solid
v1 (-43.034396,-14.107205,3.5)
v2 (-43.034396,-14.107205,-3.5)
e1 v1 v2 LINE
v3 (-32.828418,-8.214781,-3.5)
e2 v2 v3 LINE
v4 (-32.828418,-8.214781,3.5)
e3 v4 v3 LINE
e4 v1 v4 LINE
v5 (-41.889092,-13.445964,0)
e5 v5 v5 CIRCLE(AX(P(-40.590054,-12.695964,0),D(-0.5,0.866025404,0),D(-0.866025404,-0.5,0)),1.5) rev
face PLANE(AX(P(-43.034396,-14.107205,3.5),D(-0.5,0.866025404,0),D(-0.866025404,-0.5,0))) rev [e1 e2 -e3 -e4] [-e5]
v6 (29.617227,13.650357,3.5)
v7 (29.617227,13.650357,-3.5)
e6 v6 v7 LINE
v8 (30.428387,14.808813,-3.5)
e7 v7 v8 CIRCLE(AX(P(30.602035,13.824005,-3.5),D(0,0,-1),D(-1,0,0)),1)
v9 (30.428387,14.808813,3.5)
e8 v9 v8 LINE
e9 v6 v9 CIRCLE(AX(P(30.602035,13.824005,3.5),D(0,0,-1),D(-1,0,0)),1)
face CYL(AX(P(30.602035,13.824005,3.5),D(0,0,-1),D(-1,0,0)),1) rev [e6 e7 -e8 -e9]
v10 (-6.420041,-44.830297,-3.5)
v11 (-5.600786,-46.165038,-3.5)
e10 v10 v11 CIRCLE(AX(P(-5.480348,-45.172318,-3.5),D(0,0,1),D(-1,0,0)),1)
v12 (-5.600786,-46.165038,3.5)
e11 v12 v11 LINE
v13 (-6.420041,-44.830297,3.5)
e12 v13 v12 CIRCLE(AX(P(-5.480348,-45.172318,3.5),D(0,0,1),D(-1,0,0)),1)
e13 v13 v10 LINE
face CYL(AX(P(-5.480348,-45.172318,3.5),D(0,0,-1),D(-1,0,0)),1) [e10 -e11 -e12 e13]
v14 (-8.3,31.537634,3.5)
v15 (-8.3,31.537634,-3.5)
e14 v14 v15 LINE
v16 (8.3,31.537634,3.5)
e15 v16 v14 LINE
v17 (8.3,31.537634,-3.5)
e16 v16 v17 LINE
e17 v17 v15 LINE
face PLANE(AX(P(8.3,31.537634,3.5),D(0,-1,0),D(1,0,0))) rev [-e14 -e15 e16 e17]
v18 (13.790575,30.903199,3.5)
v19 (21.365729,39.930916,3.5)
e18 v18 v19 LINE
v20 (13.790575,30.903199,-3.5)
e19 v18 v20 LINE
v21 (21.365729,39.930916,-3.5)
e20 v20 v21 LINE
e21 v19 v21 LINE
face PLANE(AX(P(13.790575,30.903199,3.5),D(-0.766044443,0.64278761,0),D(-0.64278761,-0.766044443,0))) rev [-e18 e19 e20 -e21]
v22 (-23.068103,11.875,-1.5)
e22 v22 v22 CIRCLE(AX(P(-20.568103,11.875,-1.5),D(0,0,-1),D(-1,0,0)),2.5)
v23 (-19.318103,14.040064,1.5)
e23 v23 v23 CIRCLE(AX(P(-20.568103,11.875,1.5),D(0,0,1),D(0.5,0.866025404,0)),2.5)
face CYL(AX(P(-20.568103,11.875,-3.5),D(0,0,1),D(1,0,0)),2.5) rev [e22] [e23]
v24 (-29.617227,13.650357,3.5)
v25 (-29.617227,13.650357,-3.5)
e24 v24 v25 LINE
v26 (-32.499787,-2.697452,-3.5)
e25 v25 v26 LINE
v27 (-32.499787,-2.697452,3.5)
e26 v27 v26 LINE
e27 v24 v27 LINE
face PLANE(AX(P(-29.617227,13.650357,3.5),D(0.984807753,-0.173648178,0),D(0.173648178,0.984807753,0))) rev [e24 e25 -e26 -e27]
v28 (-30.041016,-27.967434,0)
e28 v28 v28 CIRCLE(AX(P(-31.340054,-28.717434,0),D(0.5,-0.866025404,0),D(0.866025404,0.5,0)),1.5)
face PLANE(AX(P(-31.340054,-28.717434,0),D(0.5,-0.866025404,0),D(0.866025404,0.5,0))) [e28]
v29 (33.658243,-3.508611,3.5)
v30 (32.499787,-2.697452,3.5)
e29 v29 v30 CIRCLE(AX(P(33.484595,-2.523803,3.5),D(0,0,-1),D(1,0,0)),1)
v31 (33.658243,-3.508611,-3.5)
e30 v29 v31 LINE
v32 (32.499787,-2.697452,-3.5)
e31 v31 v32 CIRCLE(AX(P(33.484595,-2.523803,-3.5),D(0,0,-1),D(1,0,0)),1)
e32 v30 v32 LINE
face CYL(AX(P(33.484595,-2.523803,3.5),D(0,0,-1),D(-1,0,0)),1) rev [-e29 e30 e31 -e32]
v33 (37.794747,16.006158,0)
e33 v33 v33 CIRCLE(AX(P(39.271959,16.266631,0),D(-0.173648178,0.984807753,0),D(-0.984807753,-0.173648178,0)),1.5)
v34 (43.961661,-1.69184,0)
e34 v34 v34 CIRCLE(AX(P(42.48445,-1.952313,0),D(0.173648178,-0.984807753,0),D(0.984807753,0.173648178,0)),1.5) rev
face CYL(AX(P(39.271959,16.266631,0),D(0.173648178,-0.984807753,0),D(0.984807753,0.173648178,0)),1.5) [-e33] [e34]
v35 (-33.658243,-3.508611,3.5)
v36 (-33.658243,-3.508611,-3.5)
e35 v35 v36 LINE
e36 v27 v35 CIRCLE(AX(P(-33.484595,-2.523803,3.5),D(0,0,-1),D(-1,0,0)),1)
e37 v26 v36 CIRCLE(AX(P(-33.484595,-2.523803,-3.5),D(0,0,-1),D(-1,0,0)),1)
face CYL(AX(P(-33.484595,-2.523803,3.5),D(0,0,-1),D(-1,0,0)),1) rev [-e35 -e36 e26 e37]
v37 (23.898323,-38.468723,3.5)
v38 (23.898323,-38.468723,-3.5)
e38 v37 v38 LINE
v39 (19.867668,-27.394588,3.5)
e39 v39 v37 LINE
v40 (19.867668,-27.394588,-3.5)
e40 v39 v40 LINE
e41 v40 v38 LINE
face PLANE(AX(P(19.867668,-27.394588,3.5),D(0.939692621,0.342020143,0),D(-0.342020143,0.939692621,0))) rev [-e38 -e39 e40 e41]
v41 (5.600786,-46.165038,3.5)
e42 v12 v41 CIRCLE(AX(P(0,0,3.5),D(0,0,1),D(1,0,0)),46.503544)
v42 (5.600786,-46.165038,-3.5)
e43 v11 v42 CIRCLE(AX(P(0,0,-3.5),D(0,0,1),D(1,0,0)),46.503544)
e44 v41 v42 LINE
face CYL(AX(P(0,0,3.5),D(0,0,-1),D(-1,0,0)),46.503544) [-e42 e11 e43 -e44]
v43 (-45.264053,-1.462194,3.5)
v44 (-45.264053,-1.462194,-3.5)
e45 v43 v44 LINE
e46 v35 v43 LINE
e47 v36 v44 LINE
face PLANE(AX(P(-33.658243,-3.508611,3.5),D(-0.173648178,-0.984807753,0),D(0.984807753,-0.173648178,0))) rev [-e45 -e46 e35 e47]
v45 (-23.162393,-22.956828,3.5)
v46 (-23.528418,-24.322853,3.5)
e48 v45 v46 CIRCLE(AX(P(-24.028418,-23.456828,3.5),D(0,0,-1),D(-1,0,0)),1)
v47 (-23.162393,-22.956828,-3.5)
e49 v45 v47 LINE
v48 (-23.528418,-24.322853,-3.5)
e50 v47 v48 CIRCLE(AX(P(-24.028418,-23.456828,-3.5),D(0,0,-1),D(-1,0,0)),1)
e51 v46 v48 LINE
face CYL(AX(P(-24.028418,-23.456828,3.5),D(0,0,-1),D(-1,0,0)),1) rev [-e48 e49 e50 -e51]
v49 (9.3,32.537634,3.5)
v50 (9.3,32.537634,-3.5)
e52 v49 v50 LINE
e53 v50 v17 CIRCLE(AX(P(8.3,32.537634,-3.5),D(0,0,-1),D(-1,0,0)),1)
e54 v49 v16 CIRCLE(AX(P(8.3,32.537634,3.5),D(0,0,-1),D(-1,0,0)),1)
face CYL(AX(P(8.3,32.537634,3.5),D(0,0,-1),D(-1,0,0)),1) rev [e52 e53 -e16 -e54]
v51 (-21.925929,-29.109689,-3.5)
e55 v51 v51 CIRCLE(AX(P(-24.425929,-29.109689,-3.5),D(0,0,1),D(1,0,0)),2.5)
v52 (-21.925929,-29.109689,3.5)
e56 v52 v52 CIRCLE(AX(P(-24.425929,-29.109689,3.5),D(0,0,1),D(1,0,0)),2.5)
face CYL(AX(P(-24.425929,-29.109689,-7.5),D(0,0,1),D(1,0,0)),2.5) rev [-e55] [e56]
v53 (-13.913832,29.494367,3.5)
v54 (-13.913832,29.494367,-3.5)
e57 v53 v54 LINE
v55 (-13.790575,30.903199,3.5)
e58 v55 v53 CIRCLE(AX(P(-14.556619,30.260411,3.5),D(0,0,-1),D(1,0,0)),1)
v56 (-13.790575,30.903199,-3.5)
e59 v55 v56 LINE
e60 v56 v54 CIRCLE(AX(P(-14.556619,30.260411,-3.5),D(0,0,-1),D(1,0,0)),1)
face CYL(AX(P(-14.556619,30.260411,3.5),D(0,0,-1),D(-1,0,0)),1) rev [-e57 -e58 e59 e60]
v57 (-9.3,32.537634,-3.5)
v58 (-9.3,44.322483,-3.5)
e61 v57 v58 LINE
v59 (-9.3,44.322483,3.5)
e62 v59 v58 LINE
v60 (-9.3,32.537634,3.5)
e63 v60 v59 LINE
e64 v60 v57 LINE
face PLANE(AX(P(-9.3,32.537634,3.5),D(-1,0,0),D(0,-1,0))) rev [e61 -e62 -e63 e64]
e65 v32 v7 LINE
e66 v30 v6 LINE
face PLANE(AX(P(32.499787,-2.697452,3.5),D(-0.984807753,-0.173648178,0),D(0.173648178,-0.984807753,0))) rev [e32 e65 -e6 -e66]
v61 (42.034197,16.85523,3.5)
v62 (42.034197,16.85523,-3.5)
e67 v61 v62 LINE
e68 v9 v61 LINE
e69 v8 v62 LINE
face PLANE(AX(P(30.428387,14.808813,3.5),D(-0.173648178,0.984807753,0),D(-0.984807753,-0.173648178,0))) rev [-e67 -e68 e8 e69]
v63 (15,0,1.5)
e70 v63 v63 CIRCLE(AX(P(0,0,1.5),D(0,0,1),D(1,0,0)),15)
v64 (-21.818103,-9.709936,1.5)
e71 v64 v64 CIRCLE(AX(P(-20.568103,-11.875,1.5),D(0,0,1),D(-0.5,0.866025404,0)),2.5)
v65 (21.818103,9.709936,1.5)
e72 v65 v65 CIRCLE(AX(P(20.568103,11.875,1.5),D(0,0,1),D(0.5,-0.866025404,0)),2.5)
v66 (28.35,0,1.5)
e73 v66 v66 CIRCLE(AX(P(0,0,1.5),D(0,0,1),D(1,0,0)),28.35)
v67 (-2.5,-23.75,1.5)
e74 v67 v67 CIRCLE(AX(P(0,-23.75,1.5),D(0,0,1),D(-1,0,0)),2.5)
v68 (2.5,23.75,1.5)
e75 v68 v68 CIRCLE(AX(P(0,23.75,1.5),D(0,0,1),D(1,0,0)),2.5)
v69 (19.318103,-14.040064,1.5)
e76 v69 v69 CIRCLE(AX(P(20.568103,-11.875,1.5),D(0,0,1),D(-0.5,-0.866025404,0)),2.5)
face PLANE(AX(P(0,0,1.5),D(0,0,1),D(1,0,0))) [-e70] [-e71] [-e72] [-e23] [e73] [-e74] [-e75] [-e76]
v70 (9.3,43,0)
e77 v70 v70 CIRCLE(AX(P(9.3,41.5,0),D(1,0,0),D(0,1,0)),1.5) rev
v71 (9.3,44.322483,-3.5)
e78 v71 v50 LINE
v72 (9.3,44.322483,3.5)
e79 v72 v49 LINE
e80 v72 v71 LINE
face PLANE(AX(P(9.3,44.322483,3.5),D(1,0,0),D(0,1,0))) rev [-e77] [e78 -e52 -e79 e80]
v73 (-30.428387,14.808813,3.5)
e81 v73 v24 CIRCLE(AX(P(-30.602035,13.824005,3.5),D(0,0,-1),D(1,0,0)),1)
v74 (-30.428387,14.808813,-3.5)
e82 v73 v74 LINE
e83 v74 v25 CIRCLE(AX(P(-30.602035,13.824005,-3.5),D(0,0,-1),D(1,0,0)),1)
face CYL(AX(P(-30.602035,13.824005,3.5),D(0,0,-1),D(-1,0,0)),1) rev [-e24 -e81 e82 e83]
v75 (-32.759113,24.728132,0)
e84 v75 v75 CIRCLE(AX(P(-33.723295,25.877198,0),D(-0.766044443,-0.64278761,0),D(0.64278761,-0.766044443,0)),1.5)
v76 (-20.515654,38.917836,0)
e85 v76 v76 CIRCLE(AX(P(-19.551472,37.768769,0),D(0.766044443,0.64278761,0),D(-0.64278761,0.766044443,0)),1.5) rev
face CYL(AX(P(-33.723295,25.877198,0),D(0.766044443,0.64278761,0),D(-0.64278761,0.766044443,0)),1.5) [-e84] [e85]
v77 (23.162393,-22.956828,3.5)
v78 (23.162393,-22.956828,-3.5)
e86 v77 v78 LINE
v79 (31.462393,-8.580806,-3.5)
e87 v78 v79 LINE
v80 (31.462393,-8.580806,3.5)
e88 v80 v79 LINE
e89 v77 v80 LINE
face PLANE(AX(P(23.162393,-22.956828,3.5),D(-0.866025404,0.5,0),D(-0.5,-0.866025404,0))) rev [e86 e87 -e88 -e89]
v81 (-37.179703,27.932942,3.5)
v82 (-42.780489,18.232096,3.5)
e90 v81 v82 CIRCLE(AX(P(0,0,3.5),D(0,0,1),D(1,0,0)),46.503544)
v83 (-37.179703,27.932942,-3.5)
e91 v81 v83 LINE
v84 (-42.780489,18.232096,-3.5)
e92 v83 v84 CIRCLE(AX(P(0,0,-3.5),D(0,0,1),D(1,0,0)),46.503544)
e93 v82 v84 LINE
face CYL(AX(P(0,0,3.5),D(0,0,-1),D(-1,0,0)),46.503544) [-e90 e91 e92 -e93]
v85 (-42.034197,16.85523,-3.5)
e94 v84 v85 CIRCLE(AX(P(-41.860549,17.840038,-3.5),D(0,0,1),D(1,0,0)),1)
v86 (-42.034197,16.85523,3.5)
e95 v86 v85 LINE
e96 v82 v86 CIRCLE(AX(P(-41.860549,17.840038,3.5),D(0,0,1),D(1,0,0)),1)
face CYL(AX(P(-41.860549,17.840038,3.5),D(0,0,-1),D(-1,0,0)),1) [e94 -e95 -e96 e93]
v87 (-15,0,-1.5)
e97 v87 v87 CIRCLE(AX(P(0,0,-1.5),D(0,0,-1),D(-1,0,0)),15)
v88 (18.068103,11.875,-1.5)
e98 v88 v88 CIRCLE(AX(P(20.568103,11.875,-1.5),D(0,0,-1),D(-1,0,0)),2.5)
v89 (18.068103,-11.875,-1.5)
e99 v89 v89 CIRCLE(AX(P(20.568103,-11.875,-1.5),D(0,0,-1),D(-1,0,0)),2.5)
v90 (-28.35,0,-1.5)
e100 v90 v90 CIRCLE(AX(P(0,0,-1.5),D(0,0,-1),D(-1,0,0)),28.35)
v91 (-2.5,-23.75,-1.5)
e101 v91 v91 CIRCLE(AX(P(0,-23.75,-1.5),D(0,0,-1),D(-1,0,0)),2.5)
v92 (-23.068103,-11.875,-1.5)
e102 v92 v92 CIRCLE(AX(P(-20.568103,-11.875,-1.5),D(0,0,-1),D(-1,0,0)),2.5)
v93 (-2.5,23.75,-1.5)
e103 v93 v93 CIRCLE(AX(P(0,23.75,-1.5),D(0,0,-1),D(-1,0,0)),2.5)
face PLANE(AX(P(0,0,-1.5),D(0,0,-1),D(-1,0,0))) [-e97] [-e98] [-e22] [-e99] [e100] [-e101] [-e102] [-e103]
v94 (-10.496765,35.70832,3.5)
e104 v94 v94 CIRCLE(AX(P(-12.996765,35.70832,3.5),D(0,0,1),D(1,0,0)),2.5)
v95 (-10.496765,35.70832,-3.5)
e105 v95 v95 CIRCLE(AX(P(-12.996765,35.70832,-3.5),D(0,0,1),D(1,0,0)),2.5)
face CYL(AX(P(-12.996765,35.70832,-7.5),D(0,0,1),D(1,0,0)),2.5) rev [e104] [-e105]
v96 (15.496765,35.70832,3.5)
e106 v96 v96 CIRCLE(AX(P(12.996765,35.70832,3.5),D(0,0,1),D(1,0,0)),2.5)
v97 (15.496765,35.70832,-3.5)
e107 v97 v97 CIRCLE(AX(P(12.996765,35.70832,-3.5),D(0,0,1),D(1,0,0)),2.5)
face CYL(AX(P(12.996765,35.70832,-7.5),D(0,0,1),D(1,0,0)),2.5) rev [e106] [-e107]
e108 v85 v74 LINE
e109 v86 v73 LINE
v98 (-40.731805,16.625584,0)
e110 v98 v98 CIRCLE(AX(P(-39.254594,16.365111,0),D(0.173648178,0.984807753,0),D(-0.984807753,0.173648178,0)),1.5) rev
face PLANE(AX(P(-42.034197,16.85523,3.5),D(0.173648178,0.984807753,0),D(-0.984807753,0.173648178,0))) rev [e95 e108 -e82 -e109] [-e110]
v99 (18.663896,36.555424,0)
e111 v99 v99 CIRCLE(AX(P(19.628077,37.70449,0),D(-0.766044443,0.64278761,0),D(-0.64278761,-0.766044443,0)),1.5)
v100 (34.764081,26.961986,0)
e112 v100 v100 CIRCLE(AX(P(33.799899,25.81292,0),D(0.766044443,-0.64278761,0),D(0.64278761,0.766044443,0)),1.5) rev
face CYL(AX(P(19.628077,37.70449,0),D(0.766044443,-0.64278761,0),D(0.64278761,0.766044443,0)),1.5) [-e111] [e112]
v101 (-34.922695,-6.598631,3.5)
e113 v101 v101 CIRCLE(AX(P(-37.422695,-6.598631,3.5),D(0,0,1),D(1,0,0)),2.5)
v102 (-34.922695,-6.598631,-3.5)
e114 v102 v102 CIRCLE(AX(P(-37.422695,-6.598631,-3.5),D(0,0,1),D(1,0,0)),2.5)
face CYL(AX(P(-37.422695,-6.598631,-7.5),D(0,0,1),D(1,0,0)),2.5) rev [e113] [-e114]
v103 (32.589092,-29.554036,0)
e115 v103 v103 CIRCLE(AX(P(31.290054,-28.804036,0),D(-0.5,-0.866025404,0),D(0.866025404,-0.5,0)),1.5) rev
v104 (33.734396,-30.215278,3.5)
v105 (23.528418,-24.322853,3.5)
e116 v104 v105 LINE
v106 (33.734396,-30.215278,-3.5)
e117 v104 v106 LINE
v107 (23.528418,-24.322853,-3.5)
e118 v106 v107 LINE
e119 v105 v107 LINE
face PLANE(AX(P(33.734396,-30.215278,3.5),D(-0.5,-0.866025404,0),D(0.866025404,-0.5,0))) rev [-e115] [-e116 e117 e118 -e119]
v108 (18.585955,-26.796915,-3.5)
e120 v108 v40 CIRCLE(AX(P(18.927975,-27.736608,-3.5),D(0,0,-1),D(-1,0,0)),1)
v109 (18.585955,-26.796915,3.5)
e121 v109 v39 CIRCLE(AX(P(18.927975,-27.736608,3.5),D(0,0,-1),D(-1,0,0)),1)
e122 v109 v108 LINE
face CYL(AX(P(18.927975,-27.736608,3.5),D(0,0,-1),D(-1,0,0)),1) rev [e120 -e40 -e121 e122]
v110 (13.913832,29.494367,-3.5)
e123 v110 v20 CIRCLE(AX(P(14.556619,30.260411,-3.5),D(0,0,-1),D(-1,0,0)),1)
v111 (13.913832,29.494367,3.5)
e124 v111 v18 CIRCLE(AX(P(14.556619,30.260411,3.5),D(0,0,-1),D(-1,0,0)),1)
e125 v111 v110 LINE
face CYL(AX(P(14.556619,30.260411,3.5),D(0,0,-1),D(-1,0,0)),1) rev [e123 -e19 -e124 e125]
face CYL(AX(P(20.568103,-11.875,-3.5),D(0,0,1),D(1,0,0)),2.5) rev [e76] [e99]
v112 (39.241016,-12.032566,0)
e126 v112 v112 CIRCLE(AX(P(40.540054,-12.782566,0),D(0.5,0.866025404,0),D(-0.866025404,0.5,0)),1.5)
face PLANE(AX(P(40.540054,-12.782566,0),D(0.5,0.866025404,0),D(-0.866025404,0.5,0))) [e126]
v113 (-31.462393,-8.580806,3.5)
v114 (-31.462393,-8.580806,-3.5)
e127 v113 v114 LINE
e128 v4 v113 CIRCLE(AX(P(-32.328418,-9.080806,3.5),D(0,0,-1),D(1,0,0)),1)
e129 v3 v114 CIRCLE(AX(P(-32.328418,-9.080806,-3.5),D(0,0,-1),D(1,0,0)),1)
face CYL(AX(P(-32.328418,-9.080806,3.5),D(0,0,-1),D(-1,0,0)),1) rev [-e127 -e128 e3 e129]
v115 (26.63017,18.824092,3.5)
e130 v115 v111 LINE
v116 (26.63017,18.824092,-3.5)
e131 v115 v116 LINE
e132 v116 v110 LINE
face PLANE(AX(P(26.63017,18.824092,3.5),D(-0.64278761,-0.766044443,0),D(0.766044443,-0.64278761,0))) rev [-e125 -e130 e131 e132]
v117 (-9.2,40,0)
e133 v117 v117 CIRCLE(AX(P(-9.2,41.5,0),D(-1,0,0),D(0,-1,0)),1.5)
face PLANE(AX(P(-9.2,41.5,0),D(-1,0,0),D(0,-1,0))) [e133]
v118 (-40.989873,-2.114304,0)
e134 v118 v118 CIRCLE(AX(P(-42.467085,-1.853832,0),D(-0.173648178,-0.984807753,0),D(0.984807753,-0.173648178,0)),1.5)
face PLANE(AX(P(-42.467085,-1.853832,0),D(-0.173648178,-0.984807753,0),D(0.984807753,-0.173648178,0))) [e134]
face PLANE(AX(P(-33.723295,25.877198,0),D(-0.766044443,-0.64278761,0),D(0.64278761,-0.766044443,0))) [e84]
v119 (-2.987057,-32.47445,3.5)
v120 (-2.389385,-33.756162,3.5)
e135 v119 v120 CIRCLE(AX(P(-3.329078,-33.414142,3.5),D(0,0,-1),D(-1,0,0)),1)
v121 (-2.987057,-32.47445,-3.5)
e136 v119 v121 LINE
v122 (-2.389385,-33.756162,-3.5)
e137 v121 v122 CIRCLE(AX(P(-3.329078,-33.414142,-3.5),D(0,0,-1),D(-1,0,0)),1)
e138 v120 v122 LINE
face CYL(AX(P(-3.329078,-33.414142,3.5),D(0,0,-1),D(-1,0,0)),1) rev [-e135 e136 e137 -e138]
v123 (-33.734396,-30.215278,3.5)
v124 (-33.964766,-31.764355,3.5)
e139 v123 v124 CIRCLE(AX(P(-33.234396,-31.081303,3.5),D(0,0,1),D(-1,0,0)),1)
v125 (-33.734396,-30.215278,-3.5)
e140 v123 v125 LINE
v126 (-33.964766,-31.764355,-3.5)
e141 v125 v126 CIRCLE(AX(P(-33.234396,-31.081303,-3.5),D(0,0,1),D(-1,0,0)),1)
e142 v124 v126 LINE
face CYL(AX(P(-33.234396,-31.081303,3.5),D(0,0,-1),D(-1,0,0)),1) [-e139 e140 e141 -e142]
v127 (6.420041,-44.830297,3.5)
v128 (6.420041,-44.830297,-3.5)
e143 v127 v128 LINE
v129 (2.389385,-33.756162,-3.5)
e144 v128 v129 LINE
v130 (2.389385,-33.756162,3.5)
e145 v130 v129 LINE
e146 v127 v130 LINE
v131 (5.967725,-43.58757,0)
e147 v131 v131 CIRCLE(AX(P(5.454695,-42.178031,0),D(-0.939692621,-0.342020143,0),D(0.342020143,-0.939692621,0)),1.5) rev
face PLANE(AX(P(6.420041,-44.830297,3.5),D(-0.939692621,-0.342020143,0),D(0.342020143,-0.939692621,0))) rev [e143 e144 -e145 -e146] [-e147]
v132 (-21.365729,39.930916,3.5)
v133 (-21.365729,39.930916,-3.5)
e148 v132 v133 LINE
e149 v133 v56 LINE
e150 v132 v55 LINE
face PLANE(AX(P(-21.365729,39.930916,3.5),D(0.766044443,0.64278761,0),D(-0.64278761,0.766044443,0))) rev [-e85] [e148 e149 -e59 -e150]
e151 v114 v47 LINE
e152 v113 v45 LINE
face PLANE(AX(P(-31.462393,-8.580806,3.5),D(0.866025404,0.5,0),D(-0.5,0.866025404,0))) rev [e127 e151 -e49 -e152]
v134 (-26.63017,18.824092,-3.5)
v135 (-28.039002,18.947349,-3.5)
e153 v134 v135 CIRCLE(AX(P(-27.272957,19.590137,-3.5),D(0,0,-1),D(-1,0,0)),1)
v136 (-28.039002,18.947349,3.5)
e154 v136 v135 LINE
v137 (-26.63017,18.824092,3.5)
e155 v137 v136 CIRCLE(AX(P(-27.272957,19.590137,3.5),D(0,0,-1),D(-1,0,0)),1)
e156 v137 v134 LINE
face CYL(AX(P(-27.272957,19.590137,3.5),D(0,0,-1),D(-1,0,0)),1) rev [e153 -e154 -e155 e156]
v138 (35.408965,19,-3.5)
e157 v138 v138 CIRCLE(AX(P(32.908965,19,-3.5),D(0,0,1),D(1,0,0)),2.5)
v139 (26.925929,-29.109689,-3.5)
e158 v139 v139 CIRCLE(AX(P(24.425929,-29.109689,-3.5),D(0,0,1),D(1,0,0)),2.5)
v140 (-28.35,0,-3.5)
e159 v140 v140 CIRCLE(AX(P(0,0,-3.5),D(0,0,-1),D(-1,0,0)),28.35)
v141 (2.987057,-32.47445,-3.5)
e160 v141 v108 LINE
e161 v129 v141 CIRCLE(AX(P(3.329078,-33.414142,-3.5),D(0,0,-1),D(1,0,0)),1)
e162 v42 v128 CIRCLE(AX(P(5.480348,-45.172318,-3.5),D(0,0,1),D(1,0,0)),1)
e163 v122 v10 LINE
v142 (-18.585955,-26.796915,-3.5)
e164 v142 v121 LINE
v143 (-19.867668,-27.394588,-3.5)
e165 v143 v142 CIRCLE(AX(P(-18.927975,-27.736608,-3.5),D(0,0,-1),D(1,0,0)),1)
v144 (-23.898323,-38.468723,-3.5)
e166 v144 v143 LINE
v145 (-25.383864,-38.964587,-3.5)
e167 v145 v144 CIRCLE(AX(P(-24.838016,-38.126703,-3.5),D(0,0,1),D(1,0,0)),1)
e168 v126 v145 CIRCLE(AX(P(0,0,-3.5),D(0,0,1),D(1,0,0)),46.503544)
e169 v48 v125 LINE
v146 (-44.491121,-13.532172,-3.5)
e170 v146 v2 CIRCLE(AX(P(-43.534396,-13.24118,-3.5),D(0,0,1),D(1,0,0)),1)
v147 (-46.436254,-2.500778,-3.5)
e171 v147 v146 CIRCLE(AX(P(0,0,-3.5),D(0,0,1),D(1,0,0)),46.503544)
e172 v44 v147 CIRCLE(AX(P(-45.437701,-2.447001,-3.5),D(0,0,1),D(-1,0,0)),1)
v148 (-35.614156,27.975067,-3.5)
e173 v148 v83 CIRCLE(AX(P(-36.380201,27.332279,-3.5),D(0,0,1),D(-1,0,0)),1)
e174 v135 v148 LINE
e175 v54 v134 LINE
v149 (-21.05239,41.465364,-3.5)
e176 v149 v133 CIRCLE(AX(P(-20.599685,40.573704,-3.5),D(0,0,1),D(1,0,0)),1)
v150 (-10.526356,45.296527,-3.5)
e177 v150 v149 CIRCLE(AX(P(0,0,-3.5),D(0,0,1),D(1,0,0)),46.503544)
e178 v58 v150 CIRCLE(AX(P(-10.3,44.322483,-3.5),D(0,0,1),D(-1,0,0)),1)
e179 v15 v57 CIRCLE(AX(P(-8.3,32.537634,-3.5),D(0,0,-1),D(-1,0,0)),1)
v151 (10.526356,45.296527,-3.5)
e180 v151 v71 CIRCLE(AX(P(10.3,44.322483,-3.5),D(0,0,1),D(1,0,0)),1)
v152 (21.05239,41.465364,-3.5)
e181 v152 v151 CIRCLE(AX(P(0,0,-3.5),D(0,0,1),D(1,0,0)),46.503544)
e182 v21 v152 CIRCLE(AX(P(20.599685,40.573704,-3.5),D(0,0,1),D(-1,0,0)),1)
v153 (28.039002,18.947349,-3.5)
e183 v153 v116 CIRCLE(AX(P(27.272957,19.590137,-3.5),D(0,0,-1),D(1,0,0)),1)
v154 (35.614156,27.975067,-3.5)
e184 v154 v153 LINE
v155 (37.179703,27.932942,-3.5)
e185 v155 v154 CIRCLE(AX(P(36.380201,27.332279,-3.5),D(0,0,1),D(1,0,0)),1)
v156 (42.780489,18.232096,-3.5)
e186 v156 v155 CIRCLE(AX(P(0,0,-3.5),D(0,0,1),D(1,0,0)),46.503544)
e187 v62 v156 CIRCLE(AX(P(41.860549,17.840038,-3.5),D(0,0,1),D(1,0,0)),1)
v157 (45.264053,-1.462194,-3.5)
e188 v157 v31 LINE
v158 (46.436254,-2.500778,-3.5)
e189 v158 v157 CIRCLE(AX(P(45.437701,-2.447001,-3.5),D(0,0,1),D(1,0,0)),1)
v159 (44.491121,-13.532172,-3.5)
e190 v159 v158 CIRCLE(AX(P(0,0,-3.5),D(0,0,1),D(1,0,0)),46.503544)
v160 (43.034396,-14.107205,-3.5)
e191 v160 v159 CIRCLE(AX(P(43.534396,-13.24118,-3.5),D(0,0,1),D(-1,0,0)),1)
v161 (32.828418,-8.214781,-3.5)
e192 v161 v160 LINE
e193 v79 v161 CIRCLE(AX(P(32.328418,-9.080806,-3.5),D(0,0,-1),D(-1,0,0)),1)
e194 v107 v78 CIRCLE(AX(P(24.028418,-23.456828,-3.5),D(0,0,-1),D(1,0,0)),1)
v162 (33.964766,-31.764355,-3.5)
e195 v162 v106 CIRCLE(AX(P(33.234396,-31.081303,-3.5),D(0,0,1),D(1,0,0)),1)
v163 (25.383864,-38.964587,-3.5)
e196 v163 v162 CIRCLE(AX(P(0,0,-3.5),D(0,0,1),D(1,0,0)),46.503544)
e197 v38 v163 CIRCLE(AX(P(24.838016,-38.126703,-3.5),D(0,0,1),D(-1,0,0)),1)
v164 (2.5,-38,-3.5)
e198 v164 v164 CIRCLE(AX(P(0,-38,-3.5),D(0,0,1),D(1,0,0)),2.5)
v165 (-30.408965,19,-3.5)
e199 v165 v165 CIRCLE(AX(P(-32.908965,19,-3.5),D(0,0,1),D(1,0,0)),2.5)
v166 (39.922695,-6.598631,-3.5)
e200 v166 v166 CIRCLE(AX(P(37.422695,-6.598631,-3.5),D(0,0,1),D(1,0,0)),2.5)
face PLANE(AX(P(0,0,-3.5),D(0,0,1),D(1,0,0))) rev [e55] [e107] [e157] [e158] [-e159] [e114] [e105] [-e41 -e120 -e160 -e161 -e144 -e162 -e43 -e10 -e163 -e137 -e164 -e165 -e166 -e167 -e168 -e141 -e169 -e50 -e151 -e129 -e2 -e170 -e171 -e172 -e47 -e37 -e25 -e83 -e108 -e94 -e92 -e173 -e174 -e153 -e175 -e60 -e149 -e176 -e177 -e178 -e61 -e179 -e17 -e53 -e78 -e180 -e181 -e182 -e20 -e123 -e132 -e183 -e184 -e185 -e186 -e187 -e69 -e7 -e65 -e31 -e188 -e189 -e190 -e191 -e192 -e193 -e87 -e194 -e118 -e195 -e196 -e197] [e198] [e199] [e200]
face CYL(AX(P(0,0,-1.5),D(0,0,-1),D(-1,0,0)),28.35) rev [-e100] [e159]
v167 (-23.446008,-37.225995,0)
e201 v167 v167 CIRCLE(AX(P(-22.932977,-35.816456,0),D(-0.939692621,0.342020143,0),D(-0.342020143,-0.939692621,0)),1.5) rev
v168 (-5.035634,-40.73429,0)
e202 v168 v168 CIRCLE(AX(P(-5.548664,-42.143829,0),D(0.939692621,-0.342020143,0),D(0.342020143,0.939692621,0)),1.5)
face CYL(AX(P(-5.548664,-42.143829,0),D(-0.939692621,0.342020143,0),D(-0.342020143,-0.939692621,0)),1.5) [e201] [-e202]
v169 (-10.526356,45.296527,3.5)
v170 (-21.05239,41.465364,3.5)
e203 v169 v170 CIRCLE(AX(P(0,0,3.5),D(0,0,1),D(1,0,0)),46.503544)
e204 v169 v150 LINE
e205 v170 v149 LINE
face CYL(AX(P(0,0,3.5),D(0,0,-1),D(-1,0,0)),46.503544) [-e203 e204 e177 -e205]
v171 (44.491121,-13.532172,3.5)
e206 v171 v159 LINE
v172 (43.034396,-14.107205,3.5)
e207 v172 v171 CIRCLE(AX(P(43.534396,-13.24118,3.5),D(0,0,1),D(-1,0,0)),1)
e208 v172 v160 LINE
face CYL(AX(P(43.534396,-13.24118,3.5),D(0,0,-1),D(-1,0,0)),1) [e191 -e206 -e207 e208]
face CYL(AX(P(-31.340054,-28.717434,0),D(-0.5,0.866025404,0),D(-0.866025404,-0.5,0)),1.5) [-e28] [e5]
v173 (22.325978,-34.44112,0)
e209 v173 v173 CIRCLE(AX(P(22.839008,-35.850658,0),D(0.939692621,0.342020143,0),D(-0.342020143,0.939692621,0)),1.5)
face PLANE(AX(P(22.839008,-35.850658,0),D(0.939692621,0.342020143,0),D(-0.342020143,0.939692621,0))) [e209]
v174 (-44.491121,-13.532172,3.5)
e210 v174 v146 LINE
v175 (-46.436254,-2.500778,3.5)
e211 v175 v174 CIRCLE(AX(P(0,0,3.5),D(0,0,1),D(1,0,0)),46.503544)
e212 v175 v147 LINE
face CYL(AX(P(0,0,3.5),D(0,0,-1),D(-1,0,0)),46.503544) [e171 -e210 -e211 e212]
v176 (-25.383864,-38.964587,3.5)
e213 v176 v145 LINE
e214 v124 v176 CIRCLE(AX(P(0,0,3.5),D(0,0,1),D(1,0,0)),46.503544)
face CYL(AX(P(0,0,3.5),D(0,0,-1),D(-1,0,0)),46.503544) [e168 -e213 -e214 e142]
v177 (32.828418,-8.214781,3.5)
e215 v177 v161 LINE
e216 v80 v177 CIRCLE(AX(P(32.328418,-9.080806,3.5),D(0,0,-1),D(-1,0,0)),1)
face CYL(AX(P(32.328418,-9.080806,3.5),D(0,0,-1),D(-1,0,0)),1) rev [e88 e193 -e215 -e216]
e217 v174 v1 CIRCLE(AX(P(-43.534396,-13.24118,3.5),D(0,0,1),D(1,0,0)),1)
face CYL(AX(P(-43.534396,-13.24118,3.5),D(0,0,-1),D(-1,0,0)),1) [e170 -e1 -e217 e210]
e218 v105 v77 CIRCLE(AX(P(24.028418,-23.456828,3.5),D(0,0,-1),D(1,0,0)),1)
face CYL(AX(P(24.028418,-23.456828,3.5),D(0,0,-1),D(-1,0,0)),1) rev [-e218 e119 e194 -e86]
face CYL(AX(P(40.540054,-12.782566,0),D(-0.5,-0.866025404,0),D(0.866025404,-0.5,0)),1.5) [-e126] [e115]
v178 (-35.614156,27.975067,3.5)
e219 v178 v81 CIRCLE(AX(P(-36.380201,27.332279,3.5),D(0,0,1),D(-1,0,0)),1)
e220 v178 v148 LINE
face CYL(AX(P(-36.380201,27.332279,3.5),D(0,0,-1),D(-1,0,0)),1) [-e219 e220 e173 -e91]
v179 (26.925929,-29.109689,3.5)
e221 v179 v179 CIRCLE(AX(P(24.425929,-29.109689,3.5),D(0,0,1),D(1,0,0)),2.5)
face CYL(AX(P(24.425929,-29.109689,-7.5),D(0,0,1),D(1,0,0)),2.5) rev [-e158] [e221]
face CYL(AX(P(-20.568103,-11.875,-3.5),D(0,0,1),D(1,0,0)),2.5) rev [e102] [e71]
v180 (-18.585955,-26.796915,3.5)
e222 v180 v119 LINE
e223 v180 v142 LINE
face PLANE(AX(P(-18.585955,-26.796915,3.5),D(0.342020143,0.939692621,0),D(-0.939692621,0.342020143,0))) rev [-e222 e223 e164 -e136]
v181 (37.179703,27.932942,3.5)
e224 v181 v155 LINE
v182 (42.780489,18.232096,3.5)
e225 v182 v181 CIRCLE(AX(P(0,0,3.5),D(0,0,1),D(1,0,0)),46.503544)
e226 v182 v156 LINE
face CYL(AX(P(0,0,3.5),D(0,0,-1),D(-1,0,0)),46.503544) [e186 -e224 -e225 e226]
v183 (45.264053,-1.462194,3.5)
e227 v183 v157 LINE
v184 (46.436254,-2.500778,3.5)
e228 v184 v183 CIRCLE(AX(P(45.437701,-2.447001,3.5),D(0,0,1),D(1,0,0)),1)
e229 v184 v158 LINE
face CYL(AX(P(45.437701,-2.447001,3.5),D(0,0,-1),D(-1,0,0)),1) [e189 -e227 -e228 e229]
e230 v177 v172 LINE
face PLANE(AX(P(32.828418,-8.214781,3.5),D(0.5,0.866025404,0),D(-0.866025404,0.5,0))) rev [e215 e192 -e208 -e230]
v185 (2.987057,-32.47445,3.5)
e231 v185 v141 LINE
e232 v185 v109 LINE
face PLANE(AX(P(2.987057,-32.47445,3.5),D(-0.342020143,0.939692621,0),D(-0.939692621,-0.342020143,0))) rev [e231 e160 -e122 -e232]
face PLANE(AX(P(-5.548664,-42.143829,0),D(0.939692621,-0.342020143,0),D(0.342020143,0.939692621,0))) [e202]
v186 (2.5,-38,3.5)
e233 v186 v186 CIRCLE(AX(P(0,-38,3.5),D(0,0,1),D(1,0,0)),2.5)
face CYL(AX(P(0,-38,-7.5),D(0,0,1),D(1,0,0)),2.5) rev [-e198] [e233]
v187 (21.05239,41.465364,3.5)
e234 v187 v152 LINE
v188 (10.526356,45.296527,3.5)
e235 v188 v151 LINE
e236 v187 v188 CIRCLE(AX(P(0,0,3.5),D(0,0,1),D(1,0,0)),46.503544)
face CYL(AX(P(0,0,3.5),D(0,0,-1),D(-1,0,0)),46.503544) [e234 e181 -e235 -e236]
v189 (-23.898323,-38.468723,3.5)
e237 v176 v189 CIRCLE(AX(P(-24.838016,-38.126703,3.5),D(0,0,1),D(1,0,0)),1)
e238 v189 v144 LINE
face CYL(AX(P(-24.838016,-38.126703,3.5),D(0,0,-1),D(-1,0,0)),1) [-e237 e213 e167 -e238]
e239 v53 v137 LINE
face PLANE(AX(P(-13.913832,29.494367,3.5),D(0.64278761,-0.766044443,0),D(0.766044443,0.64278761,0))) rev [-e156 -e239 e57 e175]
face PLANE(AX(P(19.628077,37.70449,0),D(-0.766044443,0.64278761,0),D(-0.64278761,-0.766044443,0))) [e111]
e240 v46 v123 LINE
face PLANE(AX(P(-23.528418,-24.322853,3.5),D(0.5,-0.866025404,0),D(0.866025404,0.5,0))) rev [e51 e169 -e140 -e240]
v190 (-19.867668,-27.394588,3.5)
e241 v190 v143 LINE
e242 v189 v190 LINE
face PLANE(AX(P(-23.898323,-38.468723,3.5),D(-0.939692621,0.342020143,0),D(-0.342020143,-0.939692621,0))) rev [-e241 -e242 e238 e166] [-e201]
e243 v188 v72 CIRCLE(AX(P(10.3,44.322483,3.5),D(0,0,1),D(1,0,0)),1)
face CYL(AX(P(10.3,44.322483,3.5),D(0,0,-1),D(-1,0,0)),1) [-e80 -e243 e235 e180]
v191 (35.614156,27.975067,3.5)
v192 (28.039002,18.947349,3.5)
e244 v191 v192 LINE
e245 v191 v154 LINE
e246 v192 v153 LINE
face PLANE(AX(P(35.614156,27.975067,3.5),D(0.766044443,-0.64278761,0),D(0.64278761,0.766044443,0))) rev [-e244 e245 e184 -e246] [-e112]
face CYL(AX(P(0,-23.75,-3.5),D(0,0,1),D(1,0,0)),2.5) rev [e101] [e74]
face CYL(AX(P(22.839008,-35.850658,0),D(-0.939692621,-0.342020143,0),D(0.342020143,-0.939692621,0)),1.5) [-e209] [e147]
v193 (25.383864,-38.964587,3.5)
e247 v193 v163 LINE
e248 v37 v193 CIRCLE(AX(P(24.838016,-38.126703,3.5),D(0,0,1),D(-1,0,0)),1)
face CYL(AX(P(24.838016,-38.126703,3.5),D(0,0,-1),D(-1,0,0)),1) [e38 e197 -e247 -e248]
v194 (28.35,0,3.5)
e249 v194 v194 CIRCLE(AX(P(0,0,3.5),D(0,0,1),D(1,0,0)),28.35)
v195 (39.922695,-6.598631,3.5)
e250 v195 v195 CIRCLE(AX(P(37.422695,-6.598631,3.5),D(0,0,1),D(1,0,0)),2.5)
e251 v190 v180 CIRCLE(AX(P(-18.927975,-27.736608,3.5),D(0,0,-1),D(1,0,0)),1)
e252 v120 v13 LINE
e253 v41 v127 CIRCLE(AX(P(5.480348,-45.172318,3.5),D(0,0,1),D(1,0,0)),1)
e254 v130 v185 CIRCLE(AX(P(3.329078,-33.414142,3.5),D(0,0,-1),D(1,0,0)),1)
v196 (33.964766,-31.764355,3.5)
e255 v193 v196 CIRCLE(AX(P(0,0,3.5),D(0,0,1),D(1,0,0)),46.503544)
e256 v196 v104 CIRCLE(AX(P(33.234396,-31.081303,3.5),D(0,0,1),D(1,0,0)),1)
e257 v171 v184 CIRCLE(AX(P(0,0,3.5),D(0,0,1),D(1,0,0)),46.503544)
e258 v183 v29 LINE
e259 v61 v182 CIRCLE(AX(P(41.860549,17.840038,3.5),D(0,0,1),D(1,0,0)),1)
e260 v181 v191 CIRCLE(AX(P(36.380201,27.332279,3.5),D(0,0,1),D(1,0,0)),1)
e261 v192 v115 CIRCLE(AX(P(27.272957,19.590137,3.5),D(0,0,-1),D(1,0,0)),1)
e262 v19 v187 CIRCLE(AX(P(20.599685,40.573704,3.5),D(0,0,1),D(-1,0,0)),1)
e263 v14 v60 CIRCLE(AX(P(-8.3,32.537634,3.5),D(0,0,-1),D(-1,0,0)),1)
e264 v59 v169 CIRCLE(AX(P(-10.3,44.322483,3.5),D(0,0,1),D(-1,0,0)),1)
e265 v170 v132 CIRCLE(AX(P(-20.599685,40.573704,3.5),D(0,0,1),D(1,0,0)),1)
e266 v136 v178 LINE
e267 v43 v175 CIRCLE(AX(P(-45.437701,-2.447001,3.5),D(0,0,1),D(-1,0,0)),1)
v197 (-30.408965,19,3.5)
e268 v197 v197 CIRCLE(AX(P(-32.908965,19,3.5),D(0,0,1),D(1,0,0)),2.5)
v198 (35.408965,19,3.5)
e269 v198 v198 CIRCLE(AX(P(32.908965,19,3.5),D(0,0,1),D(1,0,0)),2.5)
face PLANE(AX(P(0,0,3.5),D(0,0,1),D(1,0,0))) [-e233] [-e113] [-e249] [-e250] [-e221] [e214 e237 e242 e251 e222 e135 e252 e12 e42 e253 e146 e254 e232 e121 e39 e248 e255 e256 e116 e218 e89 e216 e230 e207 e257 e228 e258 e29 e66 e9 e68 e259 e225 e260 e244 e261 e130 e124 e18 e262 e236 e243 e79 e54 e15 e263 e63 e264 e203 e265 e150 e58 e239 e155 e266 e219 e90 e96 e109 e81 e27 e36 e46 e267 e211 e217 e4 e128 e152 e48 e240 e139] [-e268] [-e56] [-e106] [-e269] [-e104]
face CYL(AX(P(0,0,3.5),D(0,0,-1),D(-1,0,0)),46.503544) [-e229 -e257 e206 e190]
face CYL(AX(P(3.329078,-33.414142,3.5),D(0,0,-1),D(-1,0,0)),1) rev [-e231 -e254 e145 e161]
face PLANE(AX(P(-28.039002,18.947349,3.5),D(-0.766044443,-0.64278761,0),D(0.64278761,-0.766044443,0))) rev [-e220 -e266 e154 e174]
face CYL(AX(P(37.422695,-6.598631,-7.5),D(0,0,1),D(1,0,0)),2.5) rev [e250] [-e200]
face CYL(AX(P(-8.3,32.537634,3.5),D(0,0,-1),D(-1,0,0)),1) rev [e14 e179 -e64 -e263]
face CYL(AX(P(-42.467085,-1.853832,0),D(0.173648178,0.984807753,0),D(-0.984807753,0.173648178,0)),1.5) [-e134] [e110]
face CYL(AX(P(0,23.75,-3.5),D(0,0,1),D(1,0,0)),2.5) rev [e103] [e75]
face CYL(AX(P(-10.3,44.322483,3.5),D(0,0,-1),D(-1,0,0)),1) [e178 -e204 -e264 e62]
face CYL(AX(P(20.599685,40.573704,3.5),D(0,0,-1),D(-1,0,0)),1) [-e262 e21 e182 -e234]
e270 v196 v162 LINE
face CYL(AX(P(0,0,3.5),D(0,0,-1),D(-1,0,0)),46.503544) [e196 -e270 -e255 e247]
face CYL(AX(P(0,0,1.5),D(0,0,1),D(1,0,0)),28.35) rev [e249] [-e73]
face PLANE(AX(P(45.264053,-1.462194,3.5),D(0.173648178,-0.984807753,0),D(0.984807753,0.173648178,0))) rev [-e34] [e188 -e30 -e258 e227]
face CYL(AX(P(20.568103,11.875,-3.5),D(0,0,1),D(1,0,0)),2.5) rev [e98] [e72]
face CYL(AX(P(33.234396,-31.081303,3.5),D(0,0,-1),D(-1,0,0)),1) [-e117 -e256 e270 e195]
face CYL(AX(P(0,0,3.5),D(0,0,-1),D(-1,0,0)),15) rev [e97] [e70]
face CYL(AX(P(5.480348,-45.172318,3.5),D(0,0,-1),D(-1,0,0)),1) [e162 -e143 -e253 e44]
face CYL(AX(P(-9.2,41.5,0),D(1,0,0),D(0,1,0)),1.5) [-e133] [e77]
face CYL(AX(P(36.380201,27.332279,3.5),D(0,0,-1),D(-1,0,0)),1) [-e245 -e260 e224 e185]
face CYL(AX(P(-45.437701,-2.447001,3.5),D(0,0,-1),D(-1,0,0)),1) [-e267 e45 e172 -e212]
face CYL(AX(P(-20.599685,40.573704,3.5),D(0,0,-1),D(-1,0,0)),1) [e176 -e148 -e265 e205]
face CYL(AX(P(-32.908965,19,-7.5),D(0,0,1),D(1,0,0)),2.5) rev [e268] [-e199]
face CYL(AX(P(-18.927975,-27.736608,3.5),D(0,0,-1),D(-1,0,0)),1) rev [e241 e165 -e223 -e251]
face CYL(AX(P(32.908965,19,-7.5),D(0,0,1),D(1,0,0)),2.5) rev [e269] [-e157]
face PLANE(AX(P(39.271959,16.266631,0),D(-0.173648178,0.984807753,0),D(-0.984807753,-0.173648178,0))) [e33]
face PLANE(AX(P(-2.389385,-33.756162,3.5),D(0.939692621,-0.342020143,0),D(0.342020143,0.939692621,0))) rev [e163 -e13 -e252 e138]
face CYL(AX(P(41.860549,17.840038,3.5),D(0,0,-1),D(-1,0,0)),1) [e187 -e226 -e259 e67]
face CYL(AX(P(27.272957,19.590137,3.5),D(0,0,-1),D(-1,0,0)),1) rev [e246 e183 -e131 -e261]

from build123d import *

# Parameters (mm, degrees)
BOSS_EXTRUDE1_DEPTH      = 3.5
SKETCH3_R                = 2.5
CUT_EXTRUDE4_DEPTH       = 11
SKETCH7_R                = 28.35
CUT_EXTRUDE5_DEPTH       = 2
CUT_EXTRUDE6_START       = -2
SKETCH10_R               = 28.35
CUT_EXTRUDE6_DEPTH       = 2
SKETCH12_R               = 15
CUT_EXTRUDE7_DEPTH       = 66.909328951
SKETCH13_R               = 1.5
BOSS_EXTRUDE2_DEPTH      = 18.5
CIRPATTERN1_START        = -9.2
CIRPATTERN1_OUTLINE_R    = 1.5
CIRPATTERN1_DEPTH        = 18.5
CIRPATTERN1_2_OUTLINE_R  = 1.5
CIRPATTERN1_2_DEPTH      = 18.5
CIRPATTERN1_3_OUTLINE_R  = 1.5
CIRPATTERN1_3_DEPTH      = 18.5
CIRPATTERN1_START_2      = -9.3
CIRPATTERN1_4_OUTLINE_R  = 1.5
CIRPATTERN1_4_DEPTH      = 18.5
CIRPATTERN1_5_OUTLINE_R  = 1.5
CIRPATTERN1_5_DEPTH      = 18.5
CIRPATTERN1_6_OUTLINE_R  = 1.5
CIRPATTERN1_6_DEPTH      = 18.5
CIRPATTERN1_7_OUTLINE_R  = 1.5
CIRPATTERN1_7_DEPTH      = 18.5
CIRPATTERN1_8_OUTLINE_R  = 1.5
CIRPATTERN1_8_DEPTH      = 18.5
SKETCH_1_R               = 2.5
CUT_EXTRUDE_1_DEPTH      = 66.909328951
PATTERN_CIRCULAR_1_COUNT = 6


# Read off the part's stored shape, not the designer's step: CirPattern1
with BuildPart() as part:
    # Sketch1 → Boss-Extrude1 (new, symmetric)
    with BuildSketch(Plane.XY):
        with BuildLine():
            Line((8.3, 31.537634409), (-8.3, 31.537634409))
            ThreePointArc((-8.3, 31.537634409), (-9.007106781, 31.830527627), (-9.3, 32.537634409))
            Line((-9.3, 32.537634409), (-9.3, 44.322482838))
            ThreePointArc((-9.3, 44.322482838), (-9.67804984, 45.105539668), (-10.526355997, 45.296527479))
            ThreePointArc((-10.526355997, 45.296527479), (-15.905148665, 43.699036811), (-21.052390107, 41.465364378))
            ThreePointArc((-21.052390107, 41.465364378), (-21.579465726, 40.773778539), (-21.365729478, 39.930916453))
            Line((-21.365729478, 39.930916453), (-13.790574925, 30.903198801))
            ThreePointArc((-13.790574925, 30.903198801), (-13.56042467, 30.173255449), (-13.913831759, 29.494366748))
            Line((-13.913831759, 29.494366748), (-26.630169515, 18.824092427))
            ThreePointArc((-26.630169515, 18.824092427), (-27.360112867, 18.593942172), (-28.039001567, 18.947349261))
            Line((-28.039001567, 18.947349261), (-35.61415612, 27.975066913))
            ThreePointArc((-35.61415612, 27.975066913), (-36.407098327, 28.331917493), (-37.179703143, 27.932941958))
            ThreePointArc((-37.179703143, 27.932941958), (-40.273250169, 23.251771826), (-42.780488909, 18.232096448))
            ThreePointArc((-42.780488909, 18.232096448), (-42.73970945, 17.363513283), (-42.034196679, 16.855230478))
            Line((-42.034196679, 16.855230478), (-30.428386578, 14.808813024))
            ThreePointArc((-30.428386578, 14.808813024), (-29.782882711, 14.397581707), (-29.617227003, 13.650357093))
            Line((-29.617227003, 13.650357093), (-32.499786752, -2.697451607))
            ThreePointArc((-32.499786752, -2.697451607), (-32.911018069, -3.342955474), (-33.658242683, -3.508611182))
            Line((-33.658242683, -3.508611182), (-45.264052784, -1.462193729))
            ThreePointArc((-45.264052784, -1.462193729), (-46.100860887, -1.698523751), (-46.436253982, -2.500777546))
            ThreePointArc((-46.436253982, -2.500777546), (-45.797050331, -8.07525561), (-44.491121499, -13.532172037))
            ThreePointArc((-44.491121499, -13.532172037), (-43.901568124, -14.171332813), (-43.034396096, -14.107205164))
            Line((-43.034396096, -14.107205164), (-32.828417977, -8.214780949))
            ThreePointArc((-32.828417977, -8.214780949), (-32.069598932, -8.114880527), (-31.462392573, -8.580806353))
            Line((-31.462392573, -8.580806353), (-23.162392573, -22.956828056))
            ThreePointArc((-23.162392573, -22.956828056), (-23.062492151, -23.715647101), (-23.528417977, -24.322853459))
            Line((-23.528417977, -24.322853459), (-33.734396096, -30.215277674))
            ThreePointArc((-33.734396096, -30.215277674), (-34.223518284, -30.934206854), (-33.964765501, -31.764355442))
            ThreePointArc((-33.964765501, -31.764355442), (-29.891901666, -35.6237812), (-25.383863875, -38.964586832))
            ThreePointArc((-25.383863875, -38.964586832), (-24.52139516, -39.075254789), (-23.898323306, -38.468722725))
            Line((-23.898323306, -38.468722725), (-19.867667757, -27.394587619))
            ThreePointArc((-19.867667757, -27.394587619), (-19.350593398, -26.830299975), (-18.585954993, -26.796915141))
            Line((-18.585954993, -26.796915141), (-2.987057488, -32.47444952))
            ThreePointArc((-2.987057488, -32.47444952), (-2.422769844, -32.991523879), (-2.389385011, -33.756162285))
            Line((-2.389385011, -33.756162285), (-6.420040559, -44.830297391))
            ThreePointArc((-6.420040559, -44.830297391), (-6.332611124, -45.695430776), (-5.600785766, -46.165038406))
            ThreePointArc((-5.600785766, -46.165038406), (0, -46.503543652), (5.600785766, -46.165038406))
            ThreePointArc((5.600785766, -46.165038406), (6.332611124, -45.695430776), (6.420040559, -44.830297391))
            Line((6.420040559, -44.830297391), (2.389385011, -33.756162285))
            ThreePointArc((2.389385011, -33.756162285), (2.422769844, -32.991523879), (2.987057488, -32.47444952))
            Line((2.987057488, -32.47444952), (18.585954993, -26.796915141))
            ThreePointArc((18.585954993, -26.796915141), (19.350593398, -26.830299975), (19.867667757, -27.394587619))
            Line((19.867667757, -27.394587619), (23.898323306, -38.468722725))
            ThreePointArc((23.898323306, -38.468722725), (24.52139516, -39.075254789), (25.383863875, -38.964586832))
            ThreePointArc((25.383863875, -38.964586832), (29.891901666, -35.6237812), (33.964765501, -31.764355442))
            ThreePointArc((33.964765501, -31.764355442), (34.223518284, -30.934206854), (33.734396096, -30.215277674))
            Line((33.734396096, -30.215277674), (23.528417977, -24.322853459))
            ThreePointArc((23.528417977, -24.322853459), (23.062492151, -23.715647101), (23.162392573, -22.956828056))
            Line((23.162392573, -22.956828056), (31.462392573, -8.580806353))
            ThreePointArc((31.462392573, -8.580806353), (32.069598932, -8.114880527), (32.828417977, -8.214780949))
            Line((32.828417977, -8.214780949), (43.034396096, -14.107205164))
            ThreePointArc((43.034396096, -14.107205164), (43.901568124, -14.171332813), (44.491121499, -13.532172037))
            ThreePointArc((44.491121499, -13.532172037), (45.797050331, -8.07525561), (46.436253982, -2.500777546))
            ThreePointArc((46.436253982, -2.500777546), (46.100860887, -1.698523751), (45.264052784, -1.462193729))
            Line((45.264052784, -1.462193729), (33.658242683, -3.508611182))
            ThreePointArc((33.658242683, -3.508611182), (32.911018069, -3.342955474), (32.499786752, -2.697451607))
            Line((32.499786752, -2.697451607), (29.617227003, 13.650357093))
            ThreePointArc((29.617227003, 13.650357093), (29.782882711, 14.397581707), (30.428386578, 14.808813024))
            Line((30.428386578, 14.808813024), (42.034196679, 16.855230478))
            ThreePointArc((42.034196679, 16.855230478), (42.73970945, 17.363513283), (42.780488909, 18.232096448))
            ThreePointArc((42.780488909, 18.232096448), (40.273250169, 23.251771826), (37.179703143, 27.932941958))
            ThreePointArc((37.179703143, 27.932941958), (36.407098327, 28.331917493), (35.61415612, 27.975066913))
            Line((35.61415612, 27.975066913), (28.039001567, 18.947349261))
            ThreePointArc((28.039001567, 18.947349261), (27.360112867, 18.593942172), (26.630169515, 18.824092427))
            Line((26.630169515, 18.824092427), (13.913831759, 29.494366748))
            ThreePointArc((13.913831759, 29.494366748), (13.56042467, 30.173255449), (13.790574925, 30.903198801))
            Line((13.790574925, 30.903198801), (21.365729478, 39.930916453))
            ThreePointArc((21.365729478, 39.930916453), (21.579465726, 40.773778539), (21.052390107, 41.465364378))
            ThreePointArc((21.052390107, 41.465364378), (15.905148665, 43.699036811), (10.526355997, 45.296527479))
            ThreePointArc((10.526355997, 45.296527479), (9.67804984, 45.105539668), (9.3, 44.322482838))
            Line((9.3, 44.322482838), (9.3, 32.537634409))
            ThreePointArc((9.3, 32.537634409), (9.007106781, 31.830527627), (8.3, 31.537634409))
        make_face()
    extrude(amount=BOSS_EXTRUDE1_DEPTH, both=True)

    # Sketch3 → Cut-Extrude4 (cut)
    with BuildSketch(Plane.XY.offset(3.5)):
        with Locations((12.996765446, 35.70831959)):
            Circle(SKETCH3_R)
        with Locations((-12.996765446, 35.70831959)):
            Circle(SKETCH3_R)
        with Locations((32.908965344, 19)):
            Circle(SKETCH3_R)
        with Locations((37.422694614, -6.598630751)):
            Circle(SKETCH3_R)
        with Locations((24.425929168, -29.109688839)):
            Circle(SKETCH3_R)
        with Locations((0, -38)):
            Circle(SKETCH3_R)
        with Locations((-24.425929168, -29.109688839)):
            Circle(SKETCH3_R)
        with Locations((-37.422694614, -6.598630751)):
            Circle(SKETCH3_R)
        with Locations((-32.908965344, 19)):
            Circle(SKETCH3_R)
    extrude(amount=-CUT_EXTRUDE4_DEPTH, mode=Mode.SUBTRACT)

    # Sketch7 → Cut-Extrude5 (cut)
    with BuildSketch(Plane.XY.offset(3.5)):
        Circle(SKETCH7_R)
    extrude(amount=-CUT_EXTRUDE5_DEPTH, mode=Mode.SUBTRACT)

    # Sketch10 → Cut-Extrude6 (cut)
    with BuildSketch(Plane(origin=(0, 0, -3.5), x_dir=(-1, 0, 0), z_dir=(0, 0, -1)).offset(CUT_EXTRUDE6_START)):
        with Locations(Location((0, 0, 0), (0, 0, 180))):
            Circle(SKETCH10_R)
    extrude(amount=CUT_EXTRUDE6_DEPTH, mode=Mode.SUBTRACT)

    # Sketch12 → Cut-Extrude7 (cut, through all)
    with BuildSketch(Plane(origin=(0, 0, -1.5), x_dir=(-1, 0, 0), z_dir=(0, 0, -1))):
        Circle(SKETCH12_R)
    extrude(amount=-CUT_EXTRUDE7_DEPTH, mode=Mode.SUBTRACT)

    # Sketch13 → Boss-Extrude2 (add)
    with BuildSketch(Plane(origin=(7.124213321, -5.97792477, 0), x_dir=(0, 0, 1), z_dir=(-0.7660444431189782, 0.6427876096865393, 0))):
        with Locations(Location((0, 41.5, 0), (0, 0, 90))):
            Circle(SKETCH13_R)
    extrude(amount=BOSS_EXTRUDE2_DEPTH)

    # CirPattern1 outline → CirPattern1 (add)
    with BuildSketch(Plane.YZ.offset(CIRPATTERN1_START)):
        with Locations((41.5, 0)):
            Circle(CIRPATTERN1_OUTLINE_R)
    extrude(amount=CIRPATTERN1_DEPTH)

    # CirPattern1 2 outline → CirPattern1 2 (add)
    with BuildSketch(Plane(origin=(0, 0, 0), x_dir=(0.6427876096865098, -0.7660444431190029, 0), z_dir=(0.7660444431190028, 0.6427876096865099, 0)).offset(CIRPATTERN1_START)):
        with Locations((-41.5, 0)):
            Circle(CIRPATTERN1_2_OUTLINE_R)
    extrude(amount=CIRPATTERN1_2_DEPTH)

    # CirPattern1 3 outline → CirPattern1 3 (add)
    with BuildSketch(Plane(origin=(0, 0, 0), x_dir=(0.9848077530121979, -0.17364817766698804, 0), z_dir=(0.173648177666988, 0.984807753012198, 0)).offset(CIRPATTERN1_START)):
        with Locations((-41.5, 0)):
            Circle(CIRPATTERN1_3_OUTLINE_R)
    extrude(amount=CIRPATTERN1_3_DEPTH)

    # CirPattern1 4 outline → CirPattern1 4 (add)
    with BuildSketch(Plane(origin=(0, 0, 0), x_dir=(0.8660254037844768, 0.49999999999993383, 0), z_dir=(0.4999999999999339, -0.8660254037844768, 0)).offset(CIRPATTERN1_START_2)):
        with Locations((-41.5, 0)):
            Circle(CIRPATTERN1_4_OUTLINE_R)
    extrude(amount=CIRPATTERN1_4_DEPTH)

    # CirPattern1 5 outline → CirPattern1 5 (add)
    with BuildSketch(Plane(origin=(0, 0, 0), x_dir=(0.34202014332575803, 0.9396926207858759, 0), z_dir=(0.939692620785876, -0.342020143325758, 0)).offset(CIRPATTERN1_START_2)):
        with Locations((-41.5, 0)):
            Circle(CIRPATTERN1_5_OUTLINE_R)
    extrude(amount=CIRPATTERN1_5_DEPTH)

    # CirPattern1 6 outline → CirPattern1 6 (add)
    with BuildSketch(Plane(origin=(0, 0, 0), x_dir=(-0.34202014332555913, 0.9396926207859483, 0), z_dir=(0.9396926207859483, 0.34202014332555913, 0)).offset(CIRPATTERN1_START_2)):
        with Locations((-41.5, 0)):
            Circle(CIRPATTERN1_6_OUTLINE_R)
    extrude(amount=CIRPATTERN1_6_DEPTH)

    # CirPattern1 7 outline → CirPattern1 7 (add)
    with BuildSketch(Plane(origin=(0, 0, 0), x_dir=(0.8660254037843728, -0.500000000000114, 0), z_dir=(0.500000000000114, 0.8660254037843729, 0)).offset(CIRPATTERN1_START_2)):
        with Locations((41.5, 0)):
            Circle(CIRPATTERN1_7_OUTLINE_R)
    extrude(amount=CIRPATTERN1_7_DEPTH)

    # CirPattern1 8 outline → CirPattern1 8 (add)
    with BuildSketch(Plane(origin=(0, 0, 0), x_dir=(0.9848077530122347, 0.17364817766677898, 0), z_dir=(0.17364817766677898, -0.9848077530122348, 0)).offset(CIRPATTERN1_START)):
        with Locations((41.5, 0)):
            Circle(CIRPATTERN1_8_OUTLINE_R)
    extrude(amount=CIRPATTERN1_8_DEPTH)

    # 草圖1 → 除料-伸長1 (cut, through all)
    with BuildSketch(Plane.XY.offset(1.5)):
        with Locations((0, 23.75)):
            Circle(SKETCH_1_R)
    cut_extrude_1 = extrude(amount=-CUT_EXTRUDE_1_DEPTH, mode=Mode.SUBTRACT)

    # 環狀複製排列1: 除料-伸長1 ×6 about axis
    pattern_circular_1_axis = Axis((0, 0, 0), (0, 0, 1))
    for i in range(1, PATTERN_CIRCULAR_1_COUNT):
        add(cut_extrude_1.rotate(pattern_circular_1_axis, i * 360 / PATTERN_CIRCULAR_1_COUNT), mode=Mode.SUBTRACT)


solid = part.part
